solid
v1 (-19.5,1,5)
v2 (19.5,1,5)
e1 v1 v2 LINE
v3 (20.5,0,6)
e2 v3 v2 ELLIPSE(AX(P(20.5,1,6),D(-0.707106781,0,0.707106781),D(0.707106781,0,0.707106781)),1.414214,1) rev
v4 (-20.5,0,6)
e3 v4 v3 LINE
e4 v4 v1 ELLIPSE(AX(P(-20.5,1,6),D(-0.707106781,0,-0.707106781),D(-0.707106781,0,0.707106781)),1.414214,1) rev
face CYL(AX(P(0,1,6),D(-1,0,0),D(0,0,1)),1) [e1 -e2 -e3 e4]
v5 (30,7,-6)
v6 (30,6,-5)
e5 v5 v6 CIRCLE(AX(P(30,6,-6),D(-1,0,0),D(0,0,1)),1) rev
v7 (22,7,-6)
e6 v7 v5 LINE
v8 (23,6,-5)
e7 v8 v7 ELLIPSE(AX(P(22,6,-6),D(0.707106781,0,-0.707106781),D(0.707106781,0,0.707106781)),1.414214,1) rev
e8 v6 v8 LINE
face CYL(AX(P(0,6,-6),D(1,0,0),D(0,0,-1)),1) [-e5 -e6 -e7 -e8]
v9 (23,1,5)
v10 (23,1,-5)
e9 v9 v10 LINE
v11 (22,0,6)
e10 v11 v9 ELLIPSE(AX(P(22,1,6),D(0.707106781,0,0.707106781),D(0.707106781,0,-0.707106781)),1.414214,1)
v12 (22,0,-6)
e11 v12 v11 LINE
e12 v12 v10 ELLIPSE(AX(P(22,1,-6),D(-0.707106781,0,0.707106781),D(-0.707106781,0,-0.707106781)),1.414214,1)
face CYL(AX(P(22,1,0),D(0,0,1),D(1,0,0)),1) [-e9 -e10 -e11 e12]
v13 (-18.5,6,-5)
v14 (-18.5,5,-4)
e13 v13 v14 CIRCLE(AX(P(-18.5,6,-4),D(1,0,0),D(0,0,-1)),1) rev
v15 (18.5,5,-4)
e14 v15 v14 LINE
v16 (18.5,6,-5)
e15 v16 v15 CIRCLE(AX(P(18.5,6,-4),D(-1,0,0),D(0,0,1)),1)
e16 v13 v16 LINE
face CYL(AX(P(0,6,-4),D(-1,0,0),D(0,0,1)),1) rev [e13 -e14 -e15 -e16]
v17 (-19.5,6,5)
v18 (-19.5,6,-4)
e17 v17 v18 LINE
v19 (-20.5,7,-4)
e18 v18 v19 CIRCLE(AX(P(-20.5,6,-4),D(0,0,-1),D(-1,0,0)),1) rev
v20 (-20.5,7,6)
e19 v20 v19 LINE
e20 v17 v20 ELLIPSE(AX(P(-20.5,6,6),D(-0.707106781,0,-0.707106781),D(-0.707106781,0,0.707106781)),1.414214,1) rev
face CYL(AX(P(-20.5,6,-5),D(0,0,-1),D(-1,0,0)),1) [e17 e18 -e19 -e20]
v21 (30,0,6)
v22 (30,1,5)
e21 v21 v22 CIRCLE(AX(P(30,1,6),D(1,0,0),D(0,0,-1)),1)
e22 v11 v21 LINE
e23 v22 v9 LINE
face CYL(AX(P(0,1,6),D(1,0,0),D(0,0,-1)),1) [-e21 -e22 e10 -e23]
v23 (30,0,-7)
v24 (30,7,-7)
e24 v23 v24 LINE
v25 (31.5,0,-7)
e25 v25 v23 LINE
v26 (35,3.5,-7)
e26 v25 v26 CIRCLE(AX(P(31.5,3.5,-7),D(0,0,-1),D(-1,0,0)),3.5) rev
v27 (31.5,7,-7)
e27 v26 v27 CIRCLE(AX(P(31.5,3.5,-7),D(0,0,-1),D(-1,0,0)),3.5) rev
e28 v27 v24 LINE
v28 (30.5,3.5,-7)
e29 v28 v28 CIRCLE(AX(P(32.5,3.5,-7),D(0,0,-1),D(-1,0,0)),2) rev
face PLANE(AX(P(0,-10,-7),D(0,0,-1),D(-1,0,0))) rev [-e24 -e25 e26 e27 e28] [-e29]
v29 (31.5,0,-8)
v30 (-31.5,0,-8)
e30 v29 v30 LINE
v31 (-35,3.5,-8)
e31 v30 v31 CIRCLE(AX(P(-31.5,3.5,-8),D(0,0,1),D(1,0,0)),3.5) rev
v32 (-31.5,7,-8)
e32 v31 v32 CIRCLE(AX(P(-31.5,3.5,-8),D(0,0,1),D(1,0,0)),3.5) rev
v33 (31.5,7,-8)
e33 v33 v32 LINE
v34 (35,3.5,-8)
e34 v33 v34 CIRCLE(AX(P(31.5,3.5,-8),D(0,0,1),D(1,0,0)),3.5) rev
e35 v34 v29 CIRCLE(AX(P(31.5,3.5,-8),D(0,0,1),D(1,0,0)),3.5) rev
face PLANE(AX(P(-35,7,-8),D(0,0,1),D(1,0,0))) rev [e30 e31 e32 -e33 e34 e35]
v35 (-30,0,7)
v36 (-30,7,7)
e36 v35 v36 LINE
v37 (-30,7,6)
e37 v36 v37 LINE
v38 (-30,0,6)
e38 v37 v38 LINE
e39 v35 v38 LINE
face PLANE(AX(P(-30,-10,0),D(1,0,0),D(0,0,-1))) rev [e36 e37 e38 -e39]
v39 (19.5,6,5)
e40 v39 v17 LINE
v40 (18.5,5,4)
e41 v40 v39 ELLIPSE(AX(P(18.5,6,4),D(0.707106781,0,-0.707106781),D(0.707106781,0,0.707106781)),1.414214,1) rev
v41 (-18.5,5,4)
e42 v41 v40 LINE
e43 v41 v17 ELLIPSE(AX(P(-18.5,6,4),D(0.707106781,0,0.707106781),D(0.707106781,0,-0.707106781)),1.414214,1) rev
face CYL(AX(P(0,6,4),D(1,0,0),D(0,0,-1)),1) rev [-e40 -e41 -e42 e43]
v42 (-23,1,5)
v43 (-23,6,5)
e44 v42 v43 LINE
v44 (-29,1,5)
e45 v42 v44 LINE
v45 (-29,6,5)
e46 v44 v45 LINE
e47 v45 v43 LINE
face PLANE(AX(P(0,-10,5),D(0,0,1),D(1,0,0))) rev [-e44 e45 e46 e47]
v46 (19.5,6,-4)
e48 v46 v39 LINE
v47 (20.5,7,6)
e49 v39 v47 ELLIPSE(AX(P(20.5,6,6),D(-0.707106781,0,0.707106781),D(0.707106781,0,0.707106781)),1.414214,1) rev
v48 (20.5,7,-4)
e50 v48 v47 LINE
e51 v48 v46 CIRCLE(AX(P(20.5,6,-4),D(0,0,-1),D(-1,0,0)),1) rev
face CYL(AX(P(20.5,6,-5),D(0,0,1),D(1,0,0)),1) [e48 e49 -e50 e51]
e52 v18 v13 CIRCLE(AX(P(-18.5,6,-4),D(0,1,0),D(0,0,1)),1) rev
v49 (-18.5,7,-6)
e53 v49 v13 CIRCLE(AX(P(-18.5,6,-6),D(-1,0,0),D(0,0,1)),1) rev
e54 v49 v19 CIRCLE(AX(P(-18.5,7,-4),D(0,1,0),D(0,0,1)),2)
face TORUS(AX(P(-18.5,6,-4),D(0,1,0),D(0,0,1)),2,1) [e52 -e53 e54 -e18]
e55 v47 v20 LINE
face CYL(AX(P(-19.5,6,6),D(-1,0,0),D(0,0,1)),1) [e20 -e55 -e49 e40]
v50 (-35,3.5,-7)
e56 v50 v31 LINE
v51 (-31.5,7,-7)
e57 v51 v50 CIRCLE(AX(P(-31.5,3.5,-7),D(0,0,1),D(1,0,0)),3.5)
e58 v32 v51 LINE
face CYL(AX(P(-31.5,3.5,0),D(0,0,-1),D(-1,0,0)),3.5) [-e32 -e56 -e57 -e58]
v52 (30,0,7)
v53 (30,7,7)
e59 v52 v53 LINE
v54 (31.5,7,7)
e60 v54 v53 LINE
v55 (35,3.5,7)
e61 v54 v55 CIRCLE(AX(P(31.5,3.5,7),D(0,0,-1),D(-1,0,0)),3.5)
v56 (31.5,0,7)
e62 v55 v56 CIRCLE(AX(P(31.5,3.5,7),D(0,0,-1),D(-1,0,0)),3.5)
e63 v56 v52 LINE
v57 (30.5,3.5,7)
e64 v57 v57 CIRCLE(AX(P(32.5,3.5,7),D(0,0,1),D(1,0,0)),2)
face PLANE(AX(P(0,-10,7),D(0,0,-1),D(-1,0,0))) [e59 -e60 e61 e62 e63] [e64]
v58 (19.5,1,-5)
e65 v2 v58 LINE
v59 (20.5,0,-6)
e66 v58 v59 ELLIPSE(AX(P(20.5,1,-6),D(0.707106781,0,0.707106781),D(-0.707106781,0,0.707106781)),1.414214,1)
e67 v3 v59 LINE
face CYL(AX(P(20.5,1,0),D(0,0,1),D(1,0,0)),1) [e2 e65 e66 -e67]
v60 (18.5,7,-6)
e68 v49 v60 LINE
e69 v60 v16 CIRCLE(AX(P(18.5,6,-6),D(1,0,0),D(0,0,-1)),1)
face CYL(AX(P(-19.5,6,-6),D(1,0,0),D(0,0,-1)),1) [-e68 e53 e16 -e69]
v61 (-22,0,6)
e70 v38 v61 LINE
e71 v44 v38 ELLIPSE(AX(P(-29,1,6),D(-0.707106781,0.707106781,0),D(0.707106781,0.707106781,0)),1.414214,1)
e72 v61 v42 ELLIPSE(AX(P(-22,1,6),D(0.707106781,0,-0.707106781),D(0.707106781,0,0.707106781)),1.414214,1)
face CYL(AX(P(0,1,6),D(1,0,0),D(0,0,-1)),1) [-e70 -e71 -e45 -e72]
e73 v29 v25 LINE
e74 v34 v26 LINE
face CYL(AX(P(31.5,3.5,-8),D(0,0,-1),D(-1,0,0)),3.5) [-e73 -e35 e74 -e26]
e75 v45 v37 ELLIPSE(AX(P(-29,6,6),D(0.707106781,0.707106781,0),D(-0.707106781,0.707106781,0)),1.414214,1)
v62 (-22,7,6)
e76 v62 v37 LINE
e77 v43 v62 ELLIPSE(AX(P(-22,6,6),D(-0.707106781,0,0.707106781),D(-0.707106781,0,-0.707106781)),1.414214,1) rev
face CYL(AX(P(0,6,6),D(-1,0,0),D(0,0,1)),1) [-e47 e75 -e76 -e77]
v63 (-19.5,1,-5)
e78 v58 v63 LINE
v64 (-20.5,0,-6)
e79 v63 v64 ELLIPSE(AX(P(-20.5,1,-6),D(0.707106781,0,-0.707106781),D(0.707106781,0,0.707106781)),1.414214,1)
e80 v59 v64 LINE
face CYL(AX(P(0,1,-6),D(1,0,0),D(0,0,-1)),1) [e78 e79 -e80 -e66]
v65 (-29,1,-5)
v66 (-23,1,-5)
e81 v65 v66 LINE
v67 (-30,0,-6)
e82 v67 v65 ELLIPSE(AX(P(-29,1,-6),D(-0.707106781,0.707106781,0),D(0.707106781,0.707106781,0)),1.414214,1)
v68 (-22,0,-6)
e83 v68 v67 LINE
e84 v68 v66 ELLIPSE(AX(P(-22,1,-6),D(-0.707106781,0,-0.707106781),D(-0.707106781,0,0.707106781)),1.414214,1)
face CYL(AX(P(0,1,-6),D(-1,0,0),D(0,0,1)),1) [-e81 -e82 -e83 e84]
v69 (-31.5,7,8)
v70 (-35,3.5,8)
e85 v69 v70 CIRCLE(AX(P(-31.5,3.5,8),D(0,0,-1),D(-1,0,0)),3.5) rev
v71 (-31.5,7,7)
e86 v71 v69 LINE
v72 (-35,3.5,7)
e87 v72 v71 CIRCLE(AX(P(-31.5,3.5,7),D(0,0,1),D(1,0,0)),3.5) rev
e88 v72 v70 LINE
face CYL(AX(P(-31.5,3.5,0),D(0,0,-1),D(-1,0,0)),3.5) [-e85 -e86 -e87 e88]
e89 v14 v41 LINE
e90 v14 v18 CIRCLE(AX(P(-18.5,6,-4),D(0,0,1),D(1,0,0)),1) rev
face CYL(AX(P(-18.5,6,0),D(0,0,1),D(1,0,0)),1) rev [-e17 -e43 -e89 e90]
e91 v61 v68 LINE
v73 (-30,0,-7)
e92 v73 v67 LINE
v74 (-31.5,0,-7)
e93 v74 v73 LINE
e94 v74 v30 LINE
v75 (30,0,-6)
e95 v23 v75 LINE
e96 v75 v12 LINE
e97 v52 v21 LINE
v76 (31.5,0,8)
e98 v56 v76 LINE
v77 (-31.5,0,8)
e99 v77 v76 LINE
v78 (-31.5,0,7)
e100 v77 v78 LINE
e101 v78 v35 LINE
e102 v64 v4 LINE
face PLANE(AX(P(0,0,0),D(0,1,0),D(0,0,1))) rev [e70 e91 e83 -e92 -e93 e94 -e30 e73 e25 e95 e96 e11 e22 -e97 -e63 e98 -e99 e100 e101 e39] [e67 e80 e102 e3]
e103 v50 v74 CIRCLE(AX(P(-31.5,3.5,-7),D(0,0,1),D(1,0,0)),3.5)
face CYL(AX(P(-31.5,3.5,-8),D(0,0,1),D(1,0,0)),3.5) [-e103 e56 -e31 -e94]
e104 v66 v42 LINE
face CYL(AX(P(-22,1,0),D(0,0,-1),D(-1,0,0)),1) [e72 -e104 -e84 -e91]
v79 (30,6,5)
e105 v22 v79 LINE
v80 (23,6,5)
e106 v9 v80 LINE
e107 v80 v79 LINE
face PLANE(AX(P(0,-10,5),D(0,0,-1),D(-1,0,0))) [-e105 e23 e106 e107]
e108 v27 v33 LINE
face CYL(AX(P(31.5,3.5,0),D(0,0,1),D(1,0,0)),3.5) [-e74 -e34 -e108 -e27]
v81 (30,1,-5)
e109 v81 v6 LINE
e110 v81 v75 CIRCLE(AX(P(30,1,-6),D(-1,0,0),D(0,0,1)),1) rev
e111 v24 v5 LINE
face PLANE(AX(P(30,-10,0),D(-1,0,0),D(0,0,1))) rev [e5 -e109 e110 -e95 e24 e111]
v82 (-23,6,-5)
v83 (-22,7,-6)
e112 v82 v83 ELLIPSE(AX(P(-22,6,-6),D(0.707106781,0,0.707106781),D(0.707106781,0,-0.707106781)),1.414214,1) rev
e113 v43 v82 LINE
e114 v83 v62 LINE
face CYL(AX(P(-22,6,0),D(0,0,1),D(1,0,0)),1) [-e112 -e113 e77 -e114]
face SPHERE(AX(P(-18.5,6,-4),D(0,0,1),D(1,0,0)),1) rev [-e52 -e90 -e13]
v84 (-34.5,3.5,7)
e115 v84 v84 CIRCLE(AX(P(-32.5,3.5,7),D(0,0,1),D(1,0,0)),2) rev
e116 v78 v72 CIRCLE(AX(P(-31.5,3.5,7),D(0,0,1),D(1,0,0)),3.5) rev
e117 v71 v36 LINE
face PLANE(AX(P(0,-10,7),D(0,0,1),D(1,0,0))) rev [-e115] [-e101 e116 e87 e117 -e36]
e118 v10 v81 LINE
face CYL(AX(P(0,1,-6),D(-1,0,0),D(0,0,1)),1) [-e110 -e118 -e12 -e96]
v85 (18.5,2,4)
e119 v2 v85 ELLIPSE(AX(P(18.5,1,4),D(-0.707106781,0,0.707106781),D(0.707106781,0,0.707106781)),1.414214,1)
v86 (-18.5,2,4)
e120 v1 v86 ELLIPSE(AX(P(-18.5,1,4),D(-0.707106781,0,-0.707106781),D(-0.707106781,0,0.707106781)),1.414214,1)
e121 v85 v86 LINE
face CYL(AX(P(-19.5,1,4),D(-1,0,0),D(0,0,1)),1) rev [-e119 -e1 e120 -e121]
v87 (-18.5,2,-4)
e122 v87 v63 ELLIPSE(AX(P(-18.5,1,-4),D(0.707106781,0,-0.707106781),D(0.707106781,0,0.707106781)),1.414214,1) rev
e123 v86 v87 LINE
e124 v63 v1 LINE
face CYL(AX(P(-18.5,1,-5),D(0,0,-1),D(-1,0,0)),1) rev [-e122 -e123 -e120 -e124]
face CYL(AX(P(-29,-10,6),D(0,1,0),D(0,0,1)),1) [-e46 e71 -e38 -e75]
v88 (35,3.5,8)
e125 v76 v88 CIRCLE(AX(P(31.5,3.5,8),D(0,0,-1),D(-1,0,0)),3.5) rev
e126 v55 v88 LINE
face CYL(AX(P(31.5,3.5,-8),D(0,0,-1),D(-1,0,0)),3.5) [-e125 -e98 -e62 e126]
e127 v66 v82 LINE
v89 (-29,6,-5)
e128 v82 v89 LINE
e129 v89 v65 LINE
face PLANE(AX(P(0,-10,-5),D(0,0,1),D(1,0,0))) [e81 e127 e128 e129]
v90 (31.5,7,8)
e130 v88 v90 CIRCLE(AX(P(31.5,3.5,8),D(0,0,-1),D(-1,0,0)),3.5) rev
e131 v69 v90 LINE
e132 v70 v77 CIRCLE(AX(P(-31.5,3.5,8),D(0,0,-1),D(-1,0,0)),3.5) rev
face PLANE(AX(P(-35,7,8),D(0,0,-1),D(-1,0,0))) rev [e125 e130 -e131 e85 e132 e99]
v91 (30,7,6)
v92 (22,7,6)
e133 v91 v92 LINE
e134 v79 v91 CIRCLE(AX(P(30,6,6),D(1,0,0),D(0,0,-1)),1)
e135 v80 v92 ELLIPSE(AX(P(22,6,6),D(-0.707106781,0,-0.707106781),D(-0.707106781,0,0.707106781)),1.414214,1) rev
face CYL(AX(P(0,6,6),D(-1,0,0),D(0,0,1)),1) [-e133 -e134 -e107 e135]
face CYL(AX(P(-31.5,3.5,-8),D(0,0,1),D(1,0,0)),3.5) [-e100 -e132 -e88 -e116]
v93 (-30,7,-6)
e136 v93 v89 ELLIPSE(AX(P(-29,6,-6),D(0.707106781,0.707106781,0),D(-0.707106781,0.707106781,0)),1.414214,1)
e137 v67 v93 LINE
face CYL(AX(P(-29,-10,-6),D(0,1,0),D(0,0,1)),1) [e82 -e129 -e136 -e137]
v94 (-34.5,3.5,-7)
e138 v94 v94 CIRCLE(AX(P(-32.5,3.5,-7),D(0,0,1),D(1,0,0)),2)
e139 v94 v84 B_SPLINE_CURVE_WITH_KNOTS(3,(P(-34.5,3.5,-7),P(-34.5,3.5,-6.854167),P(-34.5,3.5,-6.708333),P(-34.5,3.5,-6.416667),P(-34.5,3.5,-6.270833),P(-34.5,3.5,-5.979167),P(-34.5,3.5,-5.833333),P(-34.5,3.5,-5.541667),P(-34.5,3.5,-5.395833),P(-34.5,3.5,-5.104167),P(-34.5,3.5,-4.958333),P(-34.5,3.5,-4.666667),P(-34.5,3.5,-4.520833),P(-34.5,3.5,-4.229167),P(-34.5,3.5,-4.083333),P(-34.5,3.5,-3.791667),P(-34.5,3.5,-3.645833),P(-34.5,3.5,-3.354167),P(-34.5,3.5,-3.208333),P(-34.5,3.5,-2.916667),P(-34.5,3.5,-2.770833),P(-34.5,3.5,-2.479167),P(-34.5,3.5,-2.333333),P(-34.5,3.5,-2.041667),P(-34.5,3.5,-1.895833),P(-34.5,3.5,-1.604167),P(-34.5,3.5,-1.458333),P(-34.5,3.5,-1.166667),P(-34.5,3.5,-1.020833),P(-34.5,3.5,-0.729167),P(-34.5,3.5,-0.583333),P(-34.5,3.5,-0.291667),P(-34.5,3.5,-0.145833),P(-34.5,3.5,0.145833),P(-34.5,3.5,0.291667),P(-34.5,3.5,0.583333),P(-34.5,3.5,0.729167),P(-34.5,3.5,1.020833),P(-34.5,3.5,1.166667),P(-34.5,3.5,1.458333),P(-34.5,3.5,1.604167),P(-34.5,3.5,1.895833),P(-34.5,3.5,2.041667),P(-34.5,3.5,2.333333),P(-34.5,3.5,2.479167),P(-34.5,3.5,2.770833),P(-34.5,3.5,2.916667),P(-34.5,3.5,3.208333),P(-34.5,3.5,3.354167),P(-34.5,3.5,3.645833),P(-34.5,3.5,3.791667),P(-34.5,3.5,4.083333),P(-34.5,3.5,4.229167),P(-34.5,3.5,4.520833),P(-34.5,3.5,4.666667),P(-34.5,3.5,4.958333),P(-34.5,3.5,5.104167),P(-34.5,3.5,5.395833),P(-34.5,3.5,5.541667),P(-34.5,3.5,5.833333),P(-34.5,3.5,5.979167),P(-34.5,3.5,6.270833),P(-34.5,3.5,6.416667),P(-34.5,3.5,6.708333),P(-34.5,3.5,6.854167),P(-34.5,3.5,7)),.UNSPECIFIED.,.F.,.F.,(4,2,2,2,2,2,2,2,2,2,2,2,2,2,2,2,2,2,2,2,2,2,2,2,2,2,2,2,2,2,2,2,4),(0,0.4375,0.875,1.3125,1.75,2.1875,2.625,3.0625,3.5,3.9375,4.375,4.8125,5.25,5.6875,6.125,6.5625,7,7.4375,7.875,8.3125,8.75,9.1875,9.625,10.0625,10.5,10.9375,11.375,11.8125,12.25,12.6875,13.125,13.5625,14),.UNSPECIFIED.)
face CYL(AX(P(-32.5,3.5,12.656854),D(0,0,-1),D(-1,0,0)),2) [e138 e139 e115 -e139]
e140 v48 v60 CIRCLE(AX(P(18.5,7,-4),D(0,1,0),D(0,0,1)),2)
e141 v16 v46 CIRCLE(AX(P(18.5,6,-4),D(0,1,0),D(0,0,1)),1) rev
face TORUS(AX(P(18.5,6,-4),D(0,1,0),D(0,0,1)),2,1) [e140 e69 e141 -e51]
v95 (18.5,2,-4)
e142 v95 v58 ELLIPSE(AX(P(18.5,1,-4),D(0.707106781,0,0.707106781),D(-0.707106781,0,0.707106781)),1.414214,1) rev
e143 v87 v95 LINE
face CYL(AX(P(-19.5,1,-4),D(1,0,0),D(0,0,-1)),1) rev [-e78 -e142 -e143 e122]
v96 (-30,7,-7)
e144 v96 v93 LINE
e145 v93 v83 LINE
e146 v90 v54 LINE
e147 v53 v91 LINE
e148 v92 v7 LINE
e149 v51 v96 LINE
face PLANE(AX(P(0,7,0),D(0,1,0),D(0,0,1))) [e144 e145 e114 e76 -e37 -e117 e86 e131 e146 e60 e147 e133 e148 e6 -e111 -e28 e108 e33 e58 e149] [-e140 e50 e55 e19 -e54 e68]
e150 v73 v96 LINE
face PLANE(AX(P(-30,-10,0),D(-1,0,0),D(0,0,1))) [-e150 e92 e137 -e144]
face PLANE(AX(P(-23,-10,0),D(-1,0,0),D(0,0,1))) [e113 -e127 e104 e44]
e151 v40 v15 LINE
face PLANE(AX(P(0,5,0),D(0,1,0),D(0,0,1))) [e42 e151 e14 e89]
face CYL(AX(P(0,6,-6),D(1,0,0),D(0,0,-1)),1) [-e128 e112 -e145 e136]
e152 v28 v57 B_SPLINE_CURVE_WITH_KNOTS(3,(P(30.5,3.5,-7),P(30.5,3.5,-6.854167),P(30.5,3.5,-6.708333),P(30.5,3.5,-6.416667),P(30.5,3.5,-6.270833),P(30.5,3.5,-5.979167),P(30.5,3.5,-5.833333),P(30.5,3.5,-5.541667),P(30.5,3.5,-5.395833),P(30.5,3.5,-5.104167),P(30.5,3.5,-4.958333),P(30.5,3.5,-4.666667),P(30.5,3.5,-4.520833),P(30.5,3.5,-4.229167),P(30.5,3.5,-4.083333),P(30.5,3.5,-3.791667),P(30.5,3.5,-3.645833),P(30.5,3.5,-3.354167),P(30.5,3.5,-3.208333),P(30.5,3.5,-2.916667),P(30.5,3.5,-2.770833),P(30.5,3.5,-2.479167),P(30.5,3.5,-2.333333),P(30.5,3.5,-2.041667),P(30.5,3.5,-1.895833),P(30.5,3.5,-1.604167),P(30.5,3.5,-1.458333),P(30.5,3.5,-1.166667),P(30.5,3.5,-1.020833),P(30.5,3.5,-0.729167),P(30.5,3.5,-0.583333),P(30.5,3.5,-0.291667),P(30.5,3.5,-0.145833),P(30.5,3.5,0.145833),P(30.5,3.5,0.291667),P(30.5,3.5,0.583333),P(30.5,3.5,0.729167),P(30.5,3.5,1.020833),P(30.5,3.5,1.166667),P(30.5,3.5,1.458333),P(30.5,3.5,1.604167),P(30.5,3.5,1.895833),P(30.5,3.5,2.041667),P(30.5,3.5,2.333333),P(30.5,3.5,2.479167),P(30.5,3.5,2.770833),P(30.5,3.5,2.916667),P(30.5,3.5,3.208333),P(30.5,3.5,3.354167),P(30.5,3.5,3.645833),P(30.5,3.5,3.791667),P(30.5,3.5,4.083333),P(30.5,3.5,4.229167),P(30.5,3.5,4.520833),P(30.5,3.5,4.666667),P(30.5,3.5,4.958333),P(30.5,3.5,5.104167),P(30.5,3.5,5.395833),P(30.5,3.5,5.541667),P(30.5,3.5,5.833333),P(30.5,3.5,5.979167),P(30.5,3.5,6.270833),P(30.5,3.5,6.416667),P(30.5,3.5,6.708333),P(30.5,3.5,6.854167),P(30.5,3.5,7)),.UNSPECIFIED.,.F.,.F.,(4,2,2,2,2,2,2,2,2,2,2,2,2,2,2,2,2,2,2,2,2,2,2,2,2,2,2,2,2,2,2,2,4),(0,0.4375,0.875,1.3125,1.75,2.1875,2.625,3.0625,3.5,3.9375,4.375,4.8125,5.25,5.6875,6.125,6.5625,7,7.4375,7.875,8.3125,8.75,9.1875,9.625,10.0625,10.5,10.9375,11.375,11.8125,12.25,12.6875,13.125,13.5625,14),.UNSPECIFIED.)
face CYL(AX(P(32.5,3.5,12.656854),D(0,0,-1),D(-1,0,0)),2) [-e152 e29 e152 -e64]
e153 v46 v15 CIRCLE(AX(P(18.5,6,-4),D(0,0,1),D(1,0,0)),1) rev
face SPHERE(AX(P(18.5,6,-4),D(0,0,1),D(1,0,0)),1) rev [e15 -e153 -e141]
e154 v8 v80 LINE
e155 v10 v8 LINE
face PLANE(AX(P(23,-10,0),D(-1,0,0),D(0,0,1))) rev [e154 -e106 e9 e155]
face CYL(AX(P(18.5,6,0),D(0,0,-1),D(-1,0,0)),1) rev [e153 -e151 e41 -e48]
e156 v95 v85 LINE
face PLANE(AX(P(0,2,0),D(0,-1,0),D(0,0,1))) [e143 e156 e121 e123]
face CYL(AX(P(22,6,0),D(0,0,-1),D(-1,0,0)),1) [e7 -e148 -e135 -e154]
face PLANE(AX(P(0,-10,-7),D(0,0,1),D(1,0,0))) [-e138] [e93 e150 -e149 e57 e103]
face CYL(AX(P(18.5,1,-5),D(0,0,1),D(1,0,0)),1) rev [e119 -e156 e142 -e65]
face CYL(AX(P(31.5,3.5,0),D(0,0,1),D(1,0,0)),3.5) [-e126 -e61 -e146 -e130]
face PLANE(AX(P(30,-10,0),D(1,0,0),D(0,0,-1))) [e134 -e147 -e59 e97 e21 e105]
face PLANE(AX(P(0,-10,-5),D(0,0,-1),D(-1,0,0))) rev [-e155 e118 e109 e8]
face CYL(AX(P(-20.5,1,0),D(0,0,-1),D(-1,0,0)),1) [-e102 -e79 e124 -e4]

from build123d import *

# Parameters (mm, degrees)
SKETCH1_W           = 70
SKETCH1_H           = 16
BOSS_EXTRUDE1_DEPTH = 7
CUT_EXTRUDE1_DEPTH  = 17
SKETCH3_R           = 2
BOSS_EXTRUDE2_DEPTH = 14
SKETCH4_W           = 39
SKETCH4_H           = 10
CUT_EXTRUDE2_DEPTH  = 2
FILLET1_R           = 1
FILLET2_R           = 3.5


with BuildPart() as part:
    # Sketch1 → Boss-Extrude1 (new body)
    with BuildSketch(Plane(origin=(0, 0, 0), x_dir=(1, 0, 0), z_dir=(0, 1, 0))):
        Rectangle(SKETCH1_W, SKETCH1_H)
    extrude(amount=BOSS_EXTRUDE1_DEPTH)

    # Sketch2 → Cut-Extrude1 (cut)
    with BuildSketch(Plane(origin=(0, 7, 0), x_dir=(1, 0, 0), z_dir=(0, 1, 0))):
        Polygon((-30, 7), (-35, 7), (-35, -7), (-30, -7), (-30, -5), (-23, -5), (-23, 5), (-30, 5), align=None)
        Polygon((30, -5), (30, -7), (35, -7), (35, 7), (30, 7), (30, 5), (23, 5), (23, -5), align=None)
    extrude(amount=-CUT_EXTRUDE1_DEPTH, mode=Mode.SUBTRACT)

    # Sketch3 → Boss-Extrude2 (add)
    with BuildSketch(Plane.XY.offset(-7)):
        with Locations((-32.5, 3.5)):
            Circle(SKETCH3_R)
        with Locations(Location((32.5, 3.5, 0), (0, 0, 180))):
            Circle(SKETCH3_R)
    extrude(amount=BOSS_EXTRUDE2_DEPTH)

    # Sketch4 → Cut-Extrude2 (cut)
    with BuildSketch(Plane(origin=(0, 7, 0), x_dir=(1, 0, 0), z_dir=(0, 1, 0))):
        Rectangle(SKETCH4_W, SKETCH4_H)
    cut_extrude2 = extrude(amount=-CUT_EXTRUDE2_DEPTH, mode=Mode.SUBTRACT)

    # Mirror1: Cut-Extrude2 across plane
    add(cut_extrude2.mirror(Plane.ZX.offset(3.5)), mode=Mode.SUBTRACT)

    # Fillet1
    fillet1_edges = [part.edges().sort_by_distance(p)[0] for p in [
        (19.5, 0, 0),
        (0, 0, -5),
        (-19.5, 0, 0),
        (0, 0, 5),
        (19.5, 2, 0),
        (0, 2, -5),
        (-19.5, 2, 0),
        (0, 2, 5),
        (26.5, 0, -5),
        (23, 0, 0),
        (26.5, 0, 5),
        (-26.5, 0, -5),
        (-23, 0, 0),
        (-26.5, 0, 5),
        (-23, 7, 0),
        (-30, 3.5, 5),
        (-30, 3.5, -5),
        (-26.5, 7, -5),
        (-26.5, 7, 5),
        (26.5, 7, 5),
        (26.5, 7, -5),
        (23, 7, 0),
        (19.5, 5, 0),
        (19.5, 6, -5),
        (0, 5, 5),
        (-19.5, 5, 0),
        (0, 5, -5),
        (-19.5, 6, -5),
        (19.5, 7, 0),
        (0, 7, -5),
        (-19.5, 7, 0),
        (0, 7, 5),
    ]]
    fillet(fillet1_edges, radius=FILLET1_R - 0.0001)  # a hair under: the kernel refuses the full size

    # Fillet2
    fillet2_edges = [part.edges().sort_by_distance(p)[0] for p in [
        (-35, 7, 7.5),
        (-35, 0, 7.5),
        (-35, 0, -7.5),
        (-35, 7, -7.5),
        (35, 0, -7.5),
        (35, 7, -7.5),
        (35, 0, 7.5),
        (35, 7, 7.5),
    ]]
    fillet(fillet2_edges, radius=FILLET2_R - 0.0001)  # a hair under: the kernel refuses the full size


solid = part.part
